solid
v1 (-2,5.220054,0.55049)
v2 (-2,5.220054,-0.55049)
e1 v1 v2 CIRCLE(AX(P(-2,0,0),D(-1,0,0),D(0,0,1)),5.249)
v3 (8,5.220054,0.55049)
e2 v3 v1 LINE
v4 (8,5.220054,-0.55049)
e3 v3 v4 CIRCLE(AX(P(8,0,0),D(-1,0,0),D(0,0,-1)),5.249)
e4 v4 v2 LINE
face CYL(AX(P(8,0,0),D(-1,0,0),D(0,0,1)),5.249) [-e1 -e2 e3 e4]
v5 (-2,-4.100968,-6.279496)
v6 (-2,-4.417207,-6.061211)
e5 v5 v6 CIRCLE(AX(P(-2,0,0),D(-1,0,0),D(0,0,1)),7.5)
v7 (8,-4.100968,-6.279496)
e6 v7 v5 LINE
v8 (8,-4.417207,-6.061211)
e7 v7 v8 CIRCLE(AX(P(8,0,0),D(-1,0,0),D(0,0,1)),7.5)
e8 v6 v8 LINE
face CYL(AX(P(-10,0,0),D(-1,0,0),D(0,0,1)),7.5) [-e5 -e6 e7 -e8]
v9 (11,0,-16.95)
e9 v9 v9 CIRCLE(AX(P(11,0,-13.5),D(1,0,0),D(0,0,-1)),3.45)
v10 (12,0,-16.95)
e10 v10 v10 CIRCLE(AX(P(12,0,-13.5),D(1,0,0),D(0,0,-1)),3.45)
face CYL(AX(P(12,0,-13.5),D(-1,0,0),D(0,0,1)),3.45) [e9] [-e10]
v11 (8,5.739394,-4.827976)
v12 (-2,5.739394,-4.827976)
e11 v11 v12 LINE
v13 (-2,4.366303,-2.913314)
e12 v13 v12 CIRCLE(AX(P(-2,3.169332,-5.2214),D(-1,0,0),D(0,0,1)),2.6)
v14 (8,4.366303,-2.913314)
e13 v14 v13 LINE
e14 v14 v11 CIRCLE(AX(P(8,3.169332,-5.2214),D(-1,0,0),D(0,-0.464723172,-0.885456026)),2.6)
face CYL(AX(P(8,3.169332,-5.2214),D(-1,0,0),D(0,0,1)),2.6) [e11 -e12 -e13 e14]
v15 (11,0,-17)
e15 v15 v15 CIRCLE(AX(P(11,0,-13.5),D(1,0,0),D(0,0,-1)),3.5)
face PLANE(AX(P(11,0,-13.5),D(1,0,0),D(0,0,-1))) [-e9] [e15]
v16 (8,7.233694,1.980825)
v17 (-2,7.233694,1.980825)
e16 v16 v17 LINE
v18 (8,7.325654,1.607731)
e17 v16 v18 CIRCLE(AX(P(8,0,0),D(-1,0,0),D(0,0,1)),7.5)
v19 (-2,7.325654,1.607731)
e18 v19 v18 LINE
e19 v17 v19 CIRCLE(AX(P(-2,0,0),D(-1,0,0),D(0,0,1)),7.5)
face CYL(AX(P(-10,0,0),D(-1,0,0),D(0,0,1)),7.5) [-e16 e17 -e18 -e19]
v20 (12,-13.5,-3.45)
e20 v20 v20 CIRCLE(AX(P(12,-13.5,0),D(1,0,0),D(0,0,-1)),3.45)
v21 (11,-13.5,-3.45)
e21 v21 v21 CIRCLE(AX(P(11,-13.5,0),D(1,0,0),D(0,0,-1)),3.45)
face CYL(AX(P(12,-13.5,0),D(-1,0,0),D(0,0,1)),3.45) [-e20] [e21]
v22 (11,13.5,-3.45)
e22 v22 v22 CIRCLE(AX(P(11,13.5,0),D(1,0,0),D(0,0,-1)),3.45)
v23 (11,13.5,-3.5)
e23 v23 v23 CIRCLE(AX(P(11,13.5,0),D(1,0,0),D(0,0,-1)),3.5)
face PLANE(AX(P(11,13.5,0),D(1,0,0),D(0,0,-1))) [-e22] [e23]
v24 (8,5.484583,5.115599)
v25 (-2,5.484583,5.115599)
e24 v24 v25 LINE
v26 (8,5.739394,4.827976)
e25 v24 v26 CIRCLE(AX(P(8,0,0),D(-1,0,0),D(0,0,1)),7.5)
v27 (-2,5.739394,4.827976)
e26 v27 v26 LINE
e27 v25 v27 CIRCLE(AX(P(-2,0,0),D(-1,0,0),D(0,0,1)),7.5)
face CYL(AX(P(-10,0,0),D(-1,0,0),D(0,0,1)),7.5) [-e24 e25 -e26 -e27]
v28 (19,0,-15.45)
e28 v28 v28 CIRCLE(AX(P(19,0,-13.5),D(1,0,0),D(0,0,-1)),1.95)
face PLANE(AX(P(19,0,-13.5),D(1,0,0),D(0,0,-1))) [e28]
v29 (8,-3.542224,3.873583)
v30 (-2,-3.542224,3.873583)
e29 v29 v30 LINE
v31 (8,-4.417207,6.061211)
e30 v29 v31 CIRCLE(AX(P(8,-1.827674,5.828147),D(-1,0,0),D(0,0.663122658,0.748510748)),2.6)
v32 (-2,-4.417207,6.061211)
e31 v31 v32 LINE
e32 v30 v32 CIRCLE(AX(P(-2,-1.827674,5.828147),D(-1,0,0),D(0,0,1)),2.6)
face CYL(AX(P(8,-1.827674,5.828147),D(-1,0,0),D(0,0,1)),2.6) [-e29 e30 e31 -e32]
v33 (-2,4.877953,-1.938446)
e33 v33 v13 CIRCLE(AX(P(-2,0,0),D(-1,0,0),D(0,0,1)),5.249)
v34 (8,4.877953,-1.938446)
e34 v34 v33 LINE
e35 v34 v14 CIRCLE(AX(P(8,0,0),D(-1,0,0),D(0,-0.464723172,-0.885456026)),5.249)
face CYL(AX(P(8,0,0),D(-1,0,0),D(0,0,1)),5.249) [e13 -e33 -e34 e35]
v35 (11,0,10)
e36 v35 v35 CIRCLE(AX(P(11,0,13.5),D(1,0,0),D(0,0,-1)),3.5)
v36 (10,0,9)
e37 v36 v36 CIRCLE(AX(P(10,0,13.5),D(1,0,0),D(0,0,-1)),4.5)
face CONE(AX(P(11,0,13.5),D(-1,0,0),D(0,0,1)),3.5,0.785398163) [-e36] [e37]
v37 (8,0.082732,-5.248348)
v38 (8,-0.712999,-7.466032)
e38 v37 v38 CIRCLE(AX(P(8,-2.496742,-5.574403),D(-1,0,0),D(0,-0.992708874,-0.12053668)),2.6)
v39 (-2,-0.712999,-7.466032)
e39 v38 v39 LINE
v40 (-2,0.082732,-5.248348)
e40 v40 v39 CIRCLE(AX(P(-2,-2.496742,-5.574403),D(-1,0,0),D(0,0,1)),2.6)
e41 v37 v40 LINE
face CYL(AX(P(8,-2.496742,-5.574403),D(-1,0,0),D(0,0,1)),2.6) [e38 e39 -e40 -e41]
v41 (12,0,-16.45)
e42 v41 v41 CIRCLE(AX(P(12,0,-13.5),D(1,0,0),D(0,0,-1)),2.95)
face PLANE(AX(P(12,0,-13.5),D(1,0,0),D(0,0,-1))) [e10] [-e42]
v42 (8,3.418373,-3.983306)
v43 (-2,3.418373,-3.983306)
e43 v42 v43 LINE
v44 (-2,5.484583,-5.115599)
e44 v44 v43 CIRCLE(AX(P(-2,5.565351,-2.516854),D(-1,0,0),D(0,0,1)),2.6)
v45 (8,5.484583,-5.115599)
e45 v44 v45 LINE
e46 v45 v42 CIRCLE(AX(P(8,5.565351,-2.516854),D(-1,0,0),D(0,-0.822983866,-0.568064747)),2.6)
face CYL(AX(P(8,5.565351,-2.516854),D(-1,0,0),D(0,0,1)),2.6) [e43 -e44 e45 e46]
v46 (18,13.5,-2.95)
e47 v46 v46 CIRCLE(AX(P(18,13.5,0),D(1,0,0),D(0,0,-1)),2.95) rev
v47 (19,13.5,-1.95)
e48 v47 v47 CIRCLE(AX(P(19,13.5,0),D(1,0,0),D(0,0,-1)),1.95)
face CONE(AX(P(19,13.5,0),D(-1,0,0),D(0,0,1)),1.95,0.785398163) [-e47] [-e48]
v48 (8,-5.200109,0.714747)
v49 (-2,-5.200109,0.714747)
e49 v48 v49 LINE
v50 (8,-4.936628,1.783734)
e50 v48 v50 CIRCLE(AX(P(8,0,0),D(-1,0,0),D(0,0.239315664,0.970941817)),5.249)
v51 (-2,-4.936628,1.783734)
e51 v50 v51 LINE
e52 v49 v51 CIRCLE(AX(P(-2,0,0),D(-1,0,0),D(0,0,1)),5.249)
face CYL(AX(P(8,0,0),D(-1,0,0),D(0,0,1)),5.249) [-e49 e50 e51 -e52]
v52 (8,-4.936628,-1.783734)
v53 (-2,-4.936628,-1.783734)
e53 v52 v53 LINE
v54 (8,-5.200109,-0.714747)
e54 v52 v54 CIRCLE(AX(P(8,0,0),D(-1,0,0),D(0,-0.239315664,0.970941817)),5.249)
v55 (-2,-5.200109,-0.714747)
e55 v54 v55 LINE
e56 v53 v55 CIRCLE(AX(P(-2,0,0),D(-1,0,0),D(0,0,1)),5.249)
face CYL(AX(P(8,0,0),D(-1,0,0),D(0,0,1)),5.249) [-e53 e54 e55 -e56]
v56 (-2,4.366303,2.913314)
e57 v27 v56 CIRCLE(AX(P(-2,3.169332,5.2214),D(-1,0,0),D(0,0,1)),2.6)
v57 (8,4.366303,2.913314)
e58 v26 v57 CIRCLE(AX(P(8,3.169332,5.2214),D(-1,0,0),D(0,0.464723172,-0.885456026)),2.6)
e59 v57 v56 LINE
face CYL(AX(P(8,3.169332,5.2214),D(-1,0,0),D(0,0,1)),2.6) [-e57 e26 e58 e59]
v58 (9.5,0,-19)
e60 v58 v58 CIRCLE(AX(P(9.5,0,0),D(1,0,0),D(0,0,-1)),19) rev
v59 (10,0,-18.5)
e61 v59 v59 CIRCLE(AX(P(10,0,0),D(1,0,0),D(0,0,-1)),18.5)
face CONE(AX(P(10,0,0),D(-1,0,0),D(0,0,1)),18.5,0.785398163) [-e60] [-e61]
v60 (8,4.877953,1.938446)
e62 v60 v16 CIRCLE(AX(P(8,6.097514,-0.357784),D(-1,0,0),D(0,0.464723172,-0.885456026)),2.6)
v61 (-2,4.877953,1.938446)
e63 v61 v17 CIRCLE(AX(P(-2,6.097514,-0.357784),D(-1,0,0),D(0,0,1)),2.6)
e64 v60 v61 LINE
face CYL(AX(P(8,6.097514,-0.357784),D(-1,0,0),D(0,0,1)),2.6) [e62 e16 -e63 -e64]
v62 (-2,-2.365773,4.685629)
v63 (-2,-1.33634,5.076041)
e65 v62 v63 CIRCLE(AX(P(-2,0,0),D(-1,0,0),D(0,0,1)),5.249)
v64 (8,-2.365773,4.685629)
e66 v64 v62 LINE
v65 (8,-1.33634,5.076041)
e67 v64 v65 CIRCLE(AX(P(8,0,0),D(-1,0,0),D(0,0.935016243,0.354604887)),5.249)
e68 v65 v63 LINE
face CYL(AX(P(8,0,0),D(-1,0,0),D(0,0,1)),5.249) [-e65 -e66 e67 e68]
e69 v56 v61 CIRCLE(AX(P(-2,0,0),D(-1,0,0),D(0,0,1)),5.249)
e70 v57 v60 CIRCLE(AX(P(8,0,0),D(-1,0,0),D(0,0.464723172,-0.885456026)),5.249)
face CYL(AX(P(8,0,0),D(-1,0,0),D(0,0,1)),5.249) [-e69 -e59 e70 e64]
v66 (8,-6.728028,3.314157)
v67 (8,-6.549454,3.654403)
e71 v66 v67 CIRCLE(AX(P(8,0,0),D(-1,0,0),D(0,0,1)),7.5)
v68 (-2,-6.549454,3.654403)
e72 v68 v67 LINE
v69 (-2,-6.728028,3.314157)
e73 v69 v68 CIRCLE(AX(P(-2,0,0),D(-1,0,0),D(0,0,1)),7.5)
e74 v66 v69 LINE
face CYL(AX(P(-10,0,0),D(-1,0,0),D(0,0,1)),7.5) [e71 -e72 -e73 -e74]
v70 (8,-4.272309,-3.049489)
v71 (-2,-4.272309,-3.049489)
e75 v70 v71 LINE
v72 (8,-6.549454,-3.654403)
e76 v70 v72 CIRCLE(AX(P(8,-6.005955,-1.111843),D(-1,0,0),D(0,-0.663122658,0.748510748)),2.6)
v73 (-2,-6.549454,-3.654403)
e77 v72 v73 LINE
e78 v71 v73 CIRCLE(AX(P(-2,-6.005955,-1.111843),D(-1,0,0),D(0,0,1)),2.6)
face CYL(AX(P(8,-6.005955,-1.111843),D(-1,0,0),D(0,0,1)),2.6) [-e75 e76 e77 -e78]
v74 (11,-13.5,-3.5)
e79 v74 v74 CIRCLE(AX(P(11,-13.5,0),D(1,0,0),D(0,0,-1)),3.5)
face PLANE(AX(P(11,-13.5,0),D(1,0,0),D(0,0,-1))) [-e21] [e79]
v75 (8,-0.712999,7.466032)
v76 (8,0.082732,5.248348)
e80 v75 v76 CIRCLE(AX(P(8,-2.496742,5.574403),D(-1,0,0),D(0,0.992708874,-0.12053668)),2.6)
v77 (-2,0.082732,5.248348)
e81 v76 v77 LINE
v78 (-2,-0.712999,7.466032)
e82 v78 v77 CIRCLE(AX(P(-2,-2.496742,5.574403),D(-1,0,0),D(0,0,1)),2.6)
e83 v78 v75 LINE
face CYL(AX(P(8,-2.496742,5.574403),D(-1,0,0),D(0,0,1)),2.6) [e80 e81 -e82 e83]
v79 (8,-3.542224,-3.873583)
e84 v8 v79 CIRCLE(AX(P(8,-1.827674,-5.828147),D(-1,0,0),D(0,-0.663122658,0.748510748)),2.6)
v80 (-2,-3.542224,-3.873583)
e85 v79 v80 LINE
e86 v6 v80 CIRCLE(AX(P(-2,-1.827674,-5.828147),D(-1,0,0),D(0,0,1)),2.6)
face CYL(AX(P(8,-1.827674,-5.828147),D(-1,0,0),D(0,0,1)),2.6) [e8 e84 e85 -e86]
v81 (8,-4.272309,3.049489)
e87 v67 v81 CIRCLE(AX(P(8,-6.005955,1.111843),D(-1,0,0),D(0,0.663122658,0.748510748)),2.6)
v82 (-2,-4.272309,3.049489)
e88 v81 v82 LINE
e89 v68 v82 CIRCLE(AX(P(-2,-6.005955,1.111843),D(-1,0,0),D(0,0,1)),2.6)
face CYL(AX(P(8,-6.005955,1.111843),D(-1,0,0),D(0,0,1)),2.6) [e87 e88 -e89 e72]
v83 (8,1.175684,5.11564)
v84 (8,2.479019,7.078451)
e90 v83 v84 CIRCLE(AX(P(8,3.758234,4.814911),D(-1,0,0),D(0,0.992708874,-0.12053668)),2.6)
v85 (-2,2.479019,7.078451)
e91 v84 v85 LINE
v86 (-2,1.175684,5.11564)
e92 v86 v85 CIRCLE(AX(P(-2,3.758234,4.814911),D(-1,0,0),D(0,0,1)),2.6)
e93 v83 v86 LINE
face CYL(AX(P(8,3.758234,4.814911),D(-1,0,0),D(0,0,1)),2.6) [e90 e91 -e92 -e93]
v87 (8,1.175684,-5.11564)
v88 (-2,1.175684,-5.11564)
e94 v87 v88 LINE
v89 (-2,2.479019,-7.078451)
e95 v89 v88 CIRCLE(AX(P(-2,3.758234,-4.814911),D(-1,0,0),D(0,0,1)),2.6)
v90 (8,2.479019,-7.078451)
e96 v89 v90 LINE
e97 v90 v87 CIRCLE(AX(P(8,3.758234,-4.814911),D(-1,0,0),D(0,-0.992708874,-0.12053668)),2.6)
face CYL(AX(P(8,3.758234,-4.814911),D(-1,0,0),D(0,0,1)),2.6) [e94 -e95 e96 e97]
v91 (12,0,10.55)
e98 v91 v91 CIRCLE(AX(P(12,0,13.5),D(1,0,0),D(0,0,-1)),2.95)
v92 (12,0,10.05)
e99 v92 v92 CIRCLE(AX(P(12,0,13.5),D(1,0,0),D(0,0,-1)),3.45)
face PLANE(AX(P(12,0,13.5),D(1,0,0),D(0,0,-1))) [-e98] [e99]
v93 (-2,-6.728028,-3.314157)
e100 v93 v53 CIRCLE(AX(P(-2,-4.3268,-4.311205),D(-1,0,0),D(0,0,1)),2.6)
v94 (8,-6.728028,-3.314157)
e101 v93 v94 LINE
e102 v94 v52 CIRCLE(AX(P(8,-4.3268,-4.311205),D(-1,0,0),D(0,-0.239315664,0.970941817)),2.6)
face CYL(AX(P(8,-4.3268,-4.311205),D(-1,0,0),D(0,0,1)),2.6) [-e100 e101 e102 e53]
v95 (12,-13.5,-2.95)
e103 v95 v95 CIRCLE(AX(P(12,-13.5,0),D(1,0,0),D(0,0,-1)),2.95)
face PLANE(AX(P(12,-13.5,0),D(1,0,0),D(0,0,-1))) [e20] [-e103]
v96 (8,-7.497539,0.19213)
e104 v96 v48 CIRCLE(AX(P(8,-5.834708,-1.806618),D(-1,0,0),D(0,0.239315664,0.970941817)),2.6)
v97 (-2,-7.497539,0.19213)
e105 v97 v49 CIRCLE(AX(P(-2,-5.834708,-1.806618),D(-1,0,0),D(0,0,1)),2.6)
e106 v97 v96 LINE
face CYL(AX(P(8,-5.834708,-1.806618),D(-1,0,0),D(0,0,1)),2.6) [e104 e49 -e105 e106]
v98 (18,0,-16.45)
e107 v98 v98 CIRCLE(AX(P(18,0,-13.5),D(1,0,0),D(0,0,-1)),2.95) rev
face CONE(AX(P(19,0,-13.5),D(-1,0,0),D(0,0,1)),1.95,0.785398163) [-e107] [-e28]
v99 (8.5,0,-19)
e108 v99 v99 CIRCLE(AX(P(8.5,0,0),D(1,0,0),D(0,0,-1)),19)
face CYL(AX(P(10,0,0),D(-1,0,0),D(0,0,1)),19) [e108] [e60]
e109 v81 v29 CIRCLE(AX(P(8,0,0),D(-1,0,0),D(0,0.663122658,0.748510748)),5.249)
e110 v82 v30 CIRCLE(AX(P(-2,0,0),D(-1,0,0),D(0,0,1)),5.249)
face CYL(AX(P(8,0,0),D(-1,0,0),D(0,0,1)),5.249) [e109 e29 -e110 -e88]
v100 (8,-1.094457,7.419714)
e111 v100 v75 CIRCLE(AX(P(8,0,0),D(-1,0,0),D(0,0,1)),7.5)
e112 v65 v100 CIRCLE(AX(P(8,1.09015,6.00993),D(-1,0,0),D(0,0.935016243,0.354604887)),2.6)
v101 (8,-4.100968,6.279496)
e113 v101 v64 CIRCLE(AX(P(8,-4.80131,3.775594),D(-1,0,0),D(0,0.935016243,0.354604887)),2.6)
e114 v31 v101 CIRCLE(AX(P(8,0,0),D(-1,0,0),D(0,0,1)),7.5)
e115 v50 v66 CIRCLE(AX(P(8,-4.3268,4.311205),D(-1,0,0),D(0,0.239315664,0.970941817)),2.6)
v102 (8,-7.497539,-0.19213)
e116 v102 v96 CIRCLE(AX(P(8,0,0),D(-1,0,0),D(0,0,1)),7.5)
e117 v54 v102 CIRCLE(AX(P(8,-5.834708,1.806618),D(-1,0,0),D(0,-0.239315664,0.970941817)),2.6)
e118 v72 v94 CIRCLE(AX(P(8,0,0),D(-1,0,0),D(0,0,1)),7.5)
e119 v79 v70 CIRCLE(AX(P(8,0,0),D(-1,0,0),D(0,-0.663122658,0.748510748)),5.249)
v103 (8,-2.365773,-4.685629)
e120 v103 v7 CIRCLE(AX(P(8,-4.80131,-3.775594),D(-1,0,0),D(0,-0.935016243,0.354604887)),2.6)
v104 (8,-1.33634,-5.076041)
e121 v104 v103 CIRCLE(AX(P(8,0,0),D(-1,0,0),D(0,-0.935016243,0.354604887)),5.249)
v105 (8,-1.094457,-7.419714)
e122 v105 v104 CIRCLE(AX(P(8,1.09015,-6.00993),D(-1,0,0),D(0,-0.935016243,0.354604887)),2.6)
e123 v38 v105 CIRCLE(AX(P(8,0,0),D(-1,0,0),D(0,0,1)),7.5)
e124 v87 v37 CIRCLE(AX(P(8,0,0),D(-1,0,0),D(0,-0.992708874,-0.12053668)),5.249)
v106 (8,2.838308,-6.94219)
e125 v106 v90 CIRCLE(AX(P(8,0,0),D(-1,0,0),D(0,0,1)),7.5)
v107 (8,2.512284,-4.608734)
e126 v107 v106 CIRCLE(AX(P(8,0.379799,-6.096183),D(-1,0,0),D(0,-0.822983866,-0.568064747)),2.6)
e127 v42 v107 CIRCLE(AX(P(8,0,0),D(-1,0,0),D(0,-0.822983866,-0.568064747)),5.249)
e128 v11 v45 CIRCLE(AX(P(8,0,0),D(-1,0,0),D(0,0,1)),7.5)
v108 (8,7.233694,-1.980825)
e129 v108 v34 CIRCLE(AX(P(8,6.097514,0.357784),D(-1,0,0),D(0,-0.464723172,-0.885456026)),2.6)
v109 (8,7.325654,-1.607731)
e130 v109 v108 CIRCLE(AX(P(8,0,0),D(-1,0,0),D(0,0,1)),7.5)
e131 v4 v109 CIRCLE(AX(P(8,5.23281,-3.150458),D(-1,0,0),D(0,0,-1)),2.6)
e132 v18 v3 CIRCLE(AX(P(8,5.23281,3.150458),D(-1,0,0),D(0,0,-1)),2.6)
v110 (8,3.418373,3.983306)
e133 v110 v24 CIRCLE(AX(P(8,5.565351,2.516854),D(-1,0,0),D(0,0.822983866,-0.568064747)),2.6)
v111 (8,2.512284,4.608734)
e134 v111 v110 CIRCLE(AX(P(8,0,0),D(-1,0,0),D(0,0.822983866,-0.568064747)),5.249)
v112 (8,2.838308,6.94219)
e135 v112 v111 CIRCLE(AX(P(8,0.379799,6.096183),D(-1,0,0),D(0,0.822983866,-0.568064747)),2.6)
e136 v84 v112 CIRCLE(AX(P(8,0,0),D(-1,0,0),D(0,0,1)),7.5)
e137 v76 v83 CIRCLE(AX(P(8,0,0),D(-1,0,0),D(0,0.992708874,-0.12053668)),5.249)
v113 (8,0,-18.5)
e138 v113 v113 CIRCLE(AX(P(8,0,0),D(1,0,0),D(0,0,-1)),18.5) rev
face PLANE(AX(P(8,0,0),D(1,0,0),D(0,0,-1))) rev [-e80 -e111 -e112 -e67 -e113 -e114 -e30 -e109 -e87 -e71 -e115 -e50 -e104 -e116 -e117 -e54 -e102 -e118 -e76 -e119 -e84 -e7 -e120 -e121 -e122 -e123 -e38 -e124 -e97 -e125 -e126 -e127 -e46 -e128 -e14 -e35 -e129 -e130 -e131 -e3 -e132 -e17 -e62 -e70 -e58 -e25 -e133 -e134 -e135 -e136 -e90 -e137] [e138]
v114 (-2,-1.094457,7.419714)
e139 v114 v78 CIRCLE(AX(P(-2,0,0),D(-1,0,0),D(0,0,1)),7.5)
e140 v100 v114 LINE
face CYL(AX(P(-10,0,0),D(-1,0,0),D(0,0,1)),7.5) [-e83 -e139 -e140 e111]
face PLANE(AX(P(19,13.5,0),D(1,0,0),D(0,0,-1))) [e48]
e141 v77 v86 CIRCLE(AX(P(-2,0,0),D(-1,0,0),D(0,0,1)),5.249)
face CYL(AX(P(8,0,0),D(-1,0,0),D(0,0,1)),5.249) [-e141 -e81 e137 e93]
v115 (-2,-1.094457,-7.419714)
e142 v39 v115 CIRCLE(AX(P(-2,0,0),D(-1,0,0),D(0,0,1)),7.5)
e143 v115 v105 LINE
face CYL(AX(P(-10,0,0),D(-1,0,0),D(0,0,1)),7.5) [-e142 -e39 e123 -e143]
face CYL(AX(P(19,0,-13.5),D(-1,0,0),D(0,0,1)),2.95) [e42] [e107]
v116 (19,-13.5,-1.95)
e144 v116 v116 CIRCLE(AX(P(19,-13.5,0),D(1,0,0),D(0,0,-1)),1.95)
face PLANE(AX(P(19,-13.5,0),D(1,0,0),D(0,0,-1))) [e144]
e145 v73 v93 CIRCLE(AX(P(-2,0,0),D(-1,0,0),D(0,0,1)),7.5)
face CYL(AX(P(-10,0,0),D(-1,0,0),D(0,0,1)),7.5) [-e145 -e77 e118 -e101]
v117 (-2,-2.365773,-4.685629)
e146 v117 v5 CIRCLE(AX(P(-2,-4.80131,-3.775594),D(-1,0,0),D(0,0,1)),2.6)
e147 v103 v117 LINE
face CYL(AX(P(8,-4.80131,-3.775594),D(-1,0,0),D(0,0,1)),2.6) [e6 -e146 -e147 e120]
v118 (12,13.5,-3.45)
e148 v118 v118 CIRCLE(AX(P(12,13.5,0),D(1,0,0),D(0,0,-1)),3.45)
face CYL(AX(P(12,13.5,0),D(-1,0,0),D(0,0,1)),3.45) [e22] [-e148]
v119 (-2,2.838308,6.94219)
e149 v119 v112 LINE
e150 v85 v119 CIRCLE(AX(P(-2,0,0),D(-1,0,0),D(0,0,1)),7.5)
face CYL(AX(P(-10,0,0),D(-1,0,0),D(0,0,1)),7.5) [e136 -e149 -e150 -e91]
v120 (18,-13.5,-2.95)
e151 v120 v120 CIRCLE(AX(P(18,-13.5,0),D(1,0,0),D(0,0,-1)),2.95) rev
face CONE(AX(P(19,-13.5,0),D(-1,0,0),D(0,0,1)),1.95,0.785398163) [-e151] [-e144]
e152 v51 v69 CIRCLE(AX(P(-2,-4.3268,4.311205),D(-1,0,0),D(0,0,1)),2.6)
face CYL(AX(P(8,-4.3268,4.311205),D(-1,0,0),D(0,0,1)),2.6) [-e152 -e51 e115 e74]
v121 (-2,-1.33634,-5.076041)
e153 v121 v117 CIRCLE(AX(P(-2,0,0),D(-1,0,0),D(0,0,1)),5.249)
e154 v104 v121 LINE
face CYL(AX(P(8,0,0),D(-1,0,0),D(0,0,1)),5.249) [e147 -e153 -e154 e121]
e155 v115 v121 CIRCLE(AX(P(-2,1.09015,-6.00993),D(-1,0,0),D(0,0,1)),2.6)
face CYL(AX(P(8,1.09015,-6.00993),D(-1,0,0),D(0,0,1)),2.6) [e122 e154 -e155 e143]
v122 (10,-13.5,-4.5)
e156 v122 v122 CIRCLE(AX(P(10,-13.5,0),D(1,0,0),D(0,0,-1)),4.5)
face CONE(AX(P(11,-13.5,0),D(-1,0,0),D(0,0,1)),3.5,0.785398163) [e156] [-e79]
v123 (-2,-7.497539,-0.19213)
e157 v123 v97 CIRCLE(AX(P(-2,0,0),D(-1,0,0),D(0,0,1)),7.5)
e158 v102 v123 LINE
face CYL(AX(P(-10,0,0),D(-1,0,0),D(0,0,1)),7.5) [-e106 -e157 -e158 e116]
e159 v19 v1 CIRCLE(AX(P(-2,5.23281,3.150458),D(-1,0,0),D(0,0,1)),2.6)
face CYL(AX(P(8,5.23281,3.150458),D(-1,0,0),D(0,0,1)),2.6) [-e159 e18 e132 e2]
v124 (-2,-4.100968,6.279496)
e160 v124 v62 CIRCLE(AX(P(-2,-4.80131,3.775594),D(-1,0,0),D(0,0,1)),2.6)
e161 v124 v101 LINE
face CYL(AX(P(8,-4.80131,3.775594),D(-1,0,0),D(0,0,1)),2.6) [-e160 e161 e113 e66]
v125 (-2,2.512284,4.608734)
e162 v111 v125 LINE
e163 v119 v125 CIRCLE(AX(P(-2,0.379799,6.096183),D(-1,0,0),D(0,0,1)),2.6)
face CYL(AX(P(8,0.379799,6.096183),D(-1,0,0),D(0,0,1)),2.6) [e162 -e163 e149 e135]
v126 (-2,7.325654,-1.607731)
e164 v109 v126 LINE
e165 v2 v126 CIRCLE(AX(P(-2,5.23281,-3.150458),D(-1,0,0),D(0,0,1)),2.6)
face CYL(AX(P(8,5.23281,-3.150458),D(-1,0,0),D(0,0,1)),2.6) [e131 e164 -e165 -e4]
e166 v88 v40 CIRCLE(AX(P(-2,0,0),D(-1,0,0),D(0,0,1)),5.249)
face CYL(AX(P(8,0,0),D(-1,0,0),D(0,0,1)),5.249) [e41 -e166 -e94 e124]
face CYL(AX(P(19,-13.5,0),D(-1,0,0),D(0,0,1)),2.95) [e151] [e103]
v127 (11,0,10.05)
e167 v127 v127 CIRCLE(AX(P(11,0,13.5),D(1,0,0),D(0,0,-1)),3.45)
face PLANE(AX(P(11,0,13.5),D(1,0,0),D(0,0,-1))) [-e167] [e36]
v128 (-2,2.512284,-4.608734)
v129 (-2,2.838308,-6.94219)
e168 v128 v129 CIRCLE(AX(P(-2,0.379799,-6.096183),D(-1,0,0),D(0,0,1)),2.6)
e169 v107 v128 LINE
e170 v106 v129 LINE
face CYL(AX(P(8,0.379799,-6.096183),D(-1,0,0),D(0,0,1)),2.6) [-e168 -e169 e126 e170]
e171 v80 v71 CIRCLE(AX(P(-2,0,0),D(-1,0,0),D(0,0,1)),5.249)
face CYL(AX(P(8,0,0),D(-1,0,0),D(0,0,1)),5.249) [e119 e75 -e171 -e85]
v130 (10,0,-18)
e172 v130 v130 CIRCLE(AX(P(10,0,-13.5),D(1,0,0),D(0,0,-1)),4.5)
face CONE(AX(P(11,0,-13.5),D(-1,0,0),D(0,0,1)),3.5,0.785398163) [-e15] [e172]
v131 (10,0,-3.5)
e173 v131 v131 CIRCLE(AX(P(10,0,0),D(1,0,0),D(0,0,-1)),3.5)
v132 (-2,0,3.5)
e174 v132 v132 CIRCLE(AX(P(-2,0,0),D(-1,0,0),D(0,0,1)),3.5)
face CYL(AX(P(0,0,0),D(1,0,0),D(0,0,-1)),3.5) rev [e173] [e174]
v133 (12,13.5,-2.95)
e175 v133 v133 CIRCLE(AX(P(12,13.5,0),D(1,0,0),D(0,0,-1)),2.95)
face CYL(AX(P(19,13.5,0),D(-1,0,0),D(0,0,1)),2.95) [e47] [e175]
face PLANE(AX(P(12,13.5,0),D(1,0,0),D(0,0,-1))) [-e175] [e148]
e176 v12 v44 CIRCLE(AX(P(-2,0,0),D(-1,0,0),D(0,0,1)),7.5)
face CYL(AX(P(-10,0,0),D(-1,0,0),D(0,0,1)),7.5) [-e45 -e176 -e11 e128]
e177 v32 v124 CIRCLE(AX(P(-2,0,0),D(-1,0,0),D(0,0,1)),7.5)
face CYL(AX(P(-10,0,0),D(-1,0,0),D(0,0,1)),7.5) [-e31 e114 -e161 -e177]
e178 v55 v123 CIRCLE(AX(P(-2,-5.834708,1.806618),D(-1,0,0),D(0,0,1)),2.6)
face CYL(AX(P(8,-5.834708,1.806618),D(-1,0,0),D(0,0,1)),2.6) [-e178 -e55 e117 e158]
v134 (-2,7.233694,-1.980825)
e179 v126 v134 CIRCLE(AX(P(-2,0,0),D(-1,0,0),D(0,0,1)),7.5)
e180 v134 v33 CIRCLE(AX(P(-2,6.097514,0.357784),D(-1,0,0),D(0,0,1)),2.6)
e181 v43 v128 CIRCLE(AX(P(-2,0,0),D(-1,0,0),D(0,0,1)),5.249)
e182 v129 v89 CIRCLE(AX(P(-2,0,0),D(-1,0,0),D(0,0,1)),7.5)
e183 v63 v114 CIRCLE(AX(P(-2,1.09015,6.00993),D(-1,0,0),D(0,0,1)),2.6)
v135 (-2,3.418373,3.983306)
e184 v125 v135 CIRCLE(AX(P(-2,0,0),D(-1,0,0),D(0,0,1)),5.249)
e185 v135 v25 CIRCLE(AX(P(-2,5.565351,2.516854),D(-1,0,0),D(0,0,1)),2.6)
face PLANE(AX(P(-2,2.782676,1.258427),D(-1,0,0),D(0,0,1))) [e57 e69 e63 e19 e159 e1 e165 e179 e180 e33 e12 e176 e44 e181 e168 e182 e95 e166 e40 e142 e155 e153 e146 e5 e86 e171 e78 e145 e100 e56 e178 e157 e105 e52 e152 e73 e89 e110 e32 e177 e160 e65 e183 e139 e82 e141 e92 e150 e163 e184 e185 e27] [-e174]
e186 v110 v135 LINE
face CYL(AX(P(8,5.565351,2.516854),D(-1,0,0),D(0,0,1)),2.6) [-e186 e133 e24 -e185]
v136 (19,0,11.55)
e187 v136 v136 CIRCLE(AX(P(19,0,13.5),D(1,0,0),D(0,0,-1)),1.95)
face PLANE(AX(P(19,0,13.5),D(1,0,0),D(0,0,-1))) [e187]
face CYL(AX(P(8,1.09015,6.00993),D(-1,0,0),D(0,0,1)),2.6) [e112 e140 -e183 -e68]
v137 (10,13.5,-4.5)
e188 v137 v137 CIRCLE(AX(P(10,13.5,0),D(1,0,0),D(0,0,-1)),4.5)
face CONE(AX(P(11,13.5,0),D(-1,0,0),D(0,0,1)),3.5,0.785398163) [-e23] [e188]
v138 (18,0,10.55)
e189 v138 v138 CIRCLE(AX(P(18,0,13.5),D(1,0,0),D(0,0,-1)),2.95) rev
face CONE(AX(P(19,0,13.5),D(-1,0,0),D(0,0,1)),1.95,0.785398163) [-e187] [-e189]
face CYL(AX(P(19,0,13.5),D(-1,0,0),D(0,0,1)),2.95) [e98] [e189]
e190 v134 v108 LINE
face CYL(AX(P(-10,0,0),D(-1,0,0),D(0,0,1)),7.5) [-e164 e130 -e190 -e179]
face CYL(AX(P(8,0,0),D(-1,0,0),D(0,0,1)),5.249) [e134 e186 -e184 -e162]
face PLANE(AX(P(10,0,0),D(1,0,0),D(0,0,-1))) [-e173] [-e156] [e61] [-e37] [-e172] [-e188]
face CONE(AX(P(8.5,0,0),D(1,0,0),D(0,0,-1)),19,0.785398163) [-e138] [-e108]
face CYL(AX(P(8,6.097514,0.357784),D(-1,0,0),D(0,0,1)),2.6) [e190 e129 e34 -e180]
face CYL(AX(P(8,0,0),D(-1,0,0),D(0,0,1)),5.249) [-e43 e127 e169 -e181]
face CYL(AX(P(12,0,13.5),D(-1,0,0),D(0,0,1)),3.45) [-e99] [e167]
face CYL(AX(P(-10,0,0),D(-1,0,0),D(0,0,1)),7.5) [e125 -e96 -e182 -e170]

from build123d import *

# Parameters (mm, degrees)
BOSS_EXTRUDE1_OUTLINE_R   = 19
BOSS_EXTRUDE1_DEPTH       = 2
BOSS_EXTRUDE1_START       = -8
BOSS_EXTRUDE1_2_OUTLINE_R = 2.5
BOSS_EXTRUDE1_2_DEPTH     = 8
SKETCH2_R                 = 3.5
CUT_EXTRUDE1_DEPTH        = 29.670542374
SKETCH3_R                 = 2.95
BOSS_EXTRUDE2_DEPTH       = 9
BOSS_EXTRUDE3_START       = 2
SKETCH5_R                 = 3.5
BOSS_EXTRUDE3_DEPTH       = 2
SKETCH6_R                 = 4.5
BOSS_EXTRUDE4_DEPTH       = 1
SKETCH7_R                 = 3.45
BOSS_EXTRUDE5_DEPTH       = 1
CHAMFER3_SIZE             = 1
CHAMFER4_SIZE             = 1
CHAMFER5_SIZE             = 0.5
SKETCH8_R                 = 3.065
BOSS_EXTRUDE6_DEPTH       = 1
CHAMFER7_SIZE             = 0.1
CUT_EXTRUDE2_START        = -5
SKETCH9_R                 = 3.929046374
SKETCH9_R_2               = 2.95
CUT_EXTRUDE2_DEPTH        = 5


with BuildPart() as part:
    # Boss-Extrude1: read off the stored shape, not the designer's step
    # Boss-Extrude1 outline → Boss-Extrude1 (new body)
    with BuildSketch(Plane(origin=(8, 0, 0), x_dir=(0, 0, -1), z_dir=(1, 0, 0))):
        Circle(BOSS_EXTRUDE1_OUTLINE_R)
    extrude(amount=BOSS_EXTRUDE1_DEPTH)

    # Boss-Extrude1 2 outline → Boss-Extrude1 2 (add)
    with BuildSketch(Plane(origin=(8, 0, 0), x_dir=(0, 0, -1), z_dir=(1, 0, 0)).offset(BOSS_EXTRUDE1_START)):
        with BuildLine():
            ThreePointArc((-4.827976462, 5.739393982), (-4.973419937, 5.613830611), (-5.115599083, 5.484582575))
            ThreePointArc((-5.115599083, 5.484582575), (-4.796933675, 4.315856884), (-3.983306334, 3.41837266))
            ThreePointArc((-3.983306334, 3.41837266), (-4.319842312, 2.981771856), (-4.608733854, 2.512284471))
            ThreePointArc((-4.608733854, 2.512284471), (-5.736412412, 2.954786958), (-6.942190227, 2.838308449))
            ThreePointArc((-6.942190227, 2.838308449), (-7.01262182, 2.659536653), (-7.078450644, 2.479019256))
            ThreePointArc((-7.078450644, 2.479019256), (-6.253152528, 1.592255251), (-5.115639582, 1.175683915))
            ThreePointArc((-5.115639582, 1.175683915), (-5.21072888, 0.632697034), (-5.24834797, 0.082732007))
            ThreePointArc((-5.24834797, 0.082732007), (-6.452498904, -0.049509856), (-7.466031873, -0.712999344))
            ThreePointArc((-7.466031873, -0.712999344), (-7.445316556, -0.904025102), (-7.419714468, -1.094457498))
            ThreePointArc((-7.419714468, -1.094457498), (-6.276849497, -1.496112872), (-5.076041451, -1.336339847))
            ThreePointArc((-5.076041451, -1.336339847), (-4.907900258, -1.861321052), (-4.685628816, -2.365773362))
            ThreePointArc((-4.685628816, -2.365773362), (-5.690395658, -3.042464558), (-6.279495593, -4.10096758))
            ThreePointArc((-6.279495593, -4.10096758), (-6.172378994, -4.2604856), (-6.061211124, -4.41720723))
            ThreePointArc((-6.061211124, -4.41720723), (-4.862595889, -4.241739566), (-3.873583397, -3.542224254))
            ThreePointArc((-3.873583397, -3.542224254), (-3.480730833, -3.928932917), (-3.049488568, -4.272308565))
            ThreePointArc((-3.049488568, -4.272308565), (-3.624691343, -5.338427296), (-3.654402549, -6.549453566))
            ThreePointArc((-3.654402549, -6.549453566), (-3.48542379, -6.640920192), (-3.314157357, -6.728028018))
            ThreePointArc((-3.314157357, -6.728028018), (-2.334380164, -6.015634844), (-1.783734068, -4.936627773))
            ThreePointArc((-1.783734068, -4.936627773), (-1.256167922, -5.0964736), (-0.714747239, -5.200109363))
            ThreePointArc((-0.714747239, -5.200109363), (-0.728613924, -6.411420676), (-0.192129921, -7.497538669))
            ThreePointArc((-0.192129921, -7.497538669), (0, -7.5), (0.192129921, -7.497538669))
            ThreePointArc((0.192129921, -7.497538669), (0.728613924, -6.411420676), (0.714747239, -5.200109363))
            ThreePointArc((0.714747239, -5.200109363), (1.256167922, -5.0964736), (1.783734068, -4.936627773))
            ThreePointArc((1.783734068, -4.936627773), (2.334380164, -6.015634844), (3.314157357, -6.728028018))
            ThreePointArc((3.314157357, -6.728028018), (3.48542379, -6.640920192), (3.654402549, -6.549453566))
            ThreePointArc((3.654402549, -6.549453566), (3.624691343, -5.338427296), (3.049488568, -4.272308565))
            ThreePointArc((3.049488568, -4.272308565), (3.480730833, -3.928932917), (3.873583397, -3.542224254))
            ThreePointArc((3.873583397, -3.542224254), (4.862595889, -4.241739566), (6.061211124, -4.41720723))
            ThreePointArc((6.061211124, -4.41720723), (6.172378994, -4.2604856), (6.279495593, -4.10096758))
            ThreePointArc((6.279495593, -4.10096758), (5.690395658, -3.042464558), (4.685628816, -2.365773362))
            ThreePointArc((4.685628816, -2.365773362), (4.907900258, -1.861321052), (5.076041451, -1.336339847))
            ThreePointArc((5.076041451, -1.336339847), (6.276849497, -1.496112872), (7.419714468, -1.094457498))
            ThreePointArc((7.419714468, -1.094457498), (7.445316556, -0.904025102), (7.466031873, -0.712999344))
            ThreePointArc((7.466031873, -0.712999344), (6.452498904, -0.049509856), (5.24834797, 0.082732007))
            ThreePointArc((5.24834797, 0.082732007), (5.21072888, 0.632697034), (5.115639582, 1.175683915))
            ThreePointArc((5.115639582, 1.175683915), (6.253152528, 1.592255251), (7.078450644, 2.479019256))
            ThreePointArc((7.078450644, 2.479019256), (7.01262182, 2.659536653), (6.942190227, 2.838308449))
            ThreePointArc((6.942190227, 2.838308449), (5.736412412, 2.954786958), (4.608733854, 2.512284471))
            ThreePointArc((4.608733854, 2.512284471), (4.319842312, 2.981771856), (3.983306334, 3.41837266))
            ThreePointArc((3.983306334, 3.41837266), (4.796933675, 4.315856884), (5.115599083, 5.484582575))
            ThreePointArc((5.115599083, 5.484582575), (4.973419937, 5.613830611), (4.827976462, 5.739393982))
            ThreePointArc((4.827976462, 5.739393982), (3.706182968, 5.282177689), (2.913314353, 4.366302839))
            ThreePointArc((2.913314353, 4.366302839), (2.43933193, 4.647758679), (1.93844561, 4.877953425))
            ThreePointArc((1.93844561, 4.877953425), (2.241795126, 6.050747718), (1.980825421, 7.233694122))
            ThreePointArc((1.980825421, 7.233694122), (1.794867482, 7.282063631), (1.607731473, 7.325653521))
            ThreePointArc((1.607731473, 7.325653521), (0.82691167, 6.399485168), (0.550489643, 5.220053846))
            ThreePointArc((0.550489643, 5.220053846), (0, 5.249), (-0.550489643, 5.220053846))
            ThreePointArc((-0.550489643, 5.220053846), (-0.82691167, 6.399485168), (-1.607731473, 7.325653521))
            ThreePointArc((-1.607731473, 7.325653521), (-1.794867482, 7.282063631), (-1.980825421, 7.233694122))
            ThreePointArc((-1.980825421, 7.233694122), (-2.241795126, 6.050747718), (-1.93844561, 4.877953425))
            ThreePointArc((-1.93844561, 4.877953425), (-2.43933193, 4.647758679), (-2.913314353, 4.366302839))
            ThreePointArc((-2.913314353, 4.366302839), (-3.706182968, 5.282177689), (-4.827976462, 5.739393982))
        make_face()
        Circle(BOSS_EXTRUDE1_2_OUTLINE_R, mode=Mode.SUBTRACT)
    extrude(amount=BOSS_EXTRUDE1_2_DEPTH)

    # Sketch2 → Cut-Extrude1 (cut, through all)
    with BuildSketch(Plane(origin=(10, 0, 0), x_dir=(0, 0, -1), z_dir=(1, 0, 0))):
        Circle(SKETCH2_R)
    extrude(amount=-CUT_EXTRUDE1_DEPTH, mode=Mode.SUBTRACT)

    # Sketch3 → Boss-Extrude2 (add)
    with BuildSketch(Plane(origin=(10, 0, 0), x_dir=(0, 0, -1), z_dir=(1, 0, 0))):
        with Locations((-13.5, 0)):
            Circle(SKETCH3_R)
        with Locations((0, 13.5)):
            Circle(SKETCH3_R)
        with Locations((13.5, 0)):
            Circle(SKETCH3_R)
        with Locations((0, -13.5)):
            Circle(SKETCH3_R)
    extrude(amount=BOSS_EXTRUDE2_DEPTH)

    # Sketch5 → Boss-Extrude3 (add)
    with BuildSketch(Plane.ZY.offset(BOSS_EXTRUDE3_START)):
        with BuildLine():
            ThreePointArc((3.983306334, 3.41837266), (4.796933675, 4.315856884), (5.115599083, 5.484582575))
            ThreePointArc((5.115599083, 5.484582575), (4.973419937, 5.613830611), (4.827976462, 5.739393982))
            ThreePointArc((4.827976462, 5.739393982), (3.706182968, 5.282177689), (2.913314353, 4.366302839))
            ThreePointArc((2.913314353, 4.366302839), (2.43933193, 4.647758679), (1.93844561, 4.877953425))
            ThreePointArc((1.93844561, 4.877953425), (2.241795126, 6.050747718), (1.980825421, 7.233694122))
            ThreePointArc((1.980825421, 7.233694122), (1.794867482, 7.282063631), (1.607731473, 7.325653521))
            ThreePointArc((1.607731473, 7.325653521), (0.82691167, 6.399485168), (0.550489643, 5.220053846))
            ThreePointArc((0.550489643, 5.220053846), (0, 5.249), (-0.550489643, 5.220053846))
            ThreePointArc((-0.550489643, 5.220053846), (-0.82691167, 6.399485168), (-1.607731473, 7.325653521))
            ThreePointArc((-1.607731473, 7.325653521), (-1.794867482, 7.282063631), (-1.980825421, 7.233694122))
            ThreePointArc((-1.980825421, 7.233694122), (-2.241795126, 6.050747718), (-1.93844561, 4.877953425))
            ThreePointArc((-1.93844561, 4.877953425), (-2.43933193, 4.647758679), (-2.913314353, 4.366302839))
            ThreePointArc((-2.913314353, 4.366302839), (-3.706182968, 5.282177689), (-4.827976462, 5.739393982))
            ThreePointArc((-4.827976462, 5.739393982), (-4.973419937, 5.613830611), (-5.115599083, 5.484582575))
            ThreePointArc((-5.115599083, 5.484582575), (-4.796933675, 4.315856884), (-3.983306334, 3.41837266))
            ThreePointArc((-3.983306334, 3.41837266), (-4.319842312, 2.981771856), (-4.608733854, 2.512284471))
            ThreePointArc((-4.608733854, 2.512284471), (-5.736412412, 2.954786958), (-6.942190227, 2.838308449))
            ThreePointArc((-6.942190227, 2.838308449), (-7.01262182, 2.659536653), (-7.078450644, 2.479019256))
            ThreePointArc((-7.078450644, 2.479019256), (-6.253152529, 1.592255251), (-5.115639582, 1.175683915))
            ThreePointArc((-5.115639582, 1.175683915), (-5.21072888, 0.632697035), (-5.24834797, 0.082732007))
            ThreePointArc((-5.24834797, 0.082732007), (-6.452498904, -0.049509856), (-7.466031873, -0.712999344))
            ThreePointArc((-7.466031873, -0.712999344), (-7.445316556, -0.904025102), (-7.419714468, -1.094457498))
            ThreePointArc((-7.419714468, -1.094457498), (-6.276849497, -1.496112872), (-5.076041451, -1.336339847))
            ThreePointArc((-5.076041451, -1.336339847), (-4.907900258, -1.861321052), (-4.685628816, -2.365773362))
            ThreePointArc((-4.685628816, -2.365773362), (-5.690395658, -3.042464558), (-6.279495593, -4.10096758))
            ThreePointArc((-6.279495593, -4.10096758), (-6.172378994, -4.2604856), (-6.061211124, -4.41720723))
            ThreePointArc((-6.061211124, -4.41720723), (-4.862595889, -4.241739566), (-3.873583397, -3.542224254))
            ThreePointArc((-3.873583397, -3.542224254), (-3.480730833, -3.928932917), (-3.049488568, -4.272308565))
            ThreePointArc((-3.049488568, -4.272308565), (-3.624691343, -5.338427296), (-3.654402549, -6.549453566))
            ThreePointArc((-3.654402549, -6.549453566), (-3.48542379, -6.640920192), (-3.314157357, -6.728028018))
            ThreePointArc((-3.314157357, -6.728028018), (-2.334380164, -6.015634844), (-1.783734068, -4.936627773))
            ThreePointArc((-1.783734068, -4.936627773), (-1.256167922, -5.0964736), (-0.714747239, -5.200109363))
            ThreePointArc((-0.714747239, -5.200109363), (-0.728613924, -6.411420676), (-0.192129921, -7.497538669))
            ThreePointArc((-0.192129921, -7.497538669), (0, -7.5), (0.192129921, -7.497538669))
            ThreePointArc((0.192129921, -7.497538669), (0.728613924, -6.411420676), (0.714747239, -5.200109363))
            ThreePointArc((0.714747239, -5.200109363), (1.256167922, -5.0964736), (1.783734068, -4.936627773))
            ThreePointArc((1.783734068, -4.936627773), (2.334380164, -6.015634844), (3.314157357, -6.728028018))
            ThreePointArc((3.314157357, -6.728028018), (3.48542379, -6.640920192), (3.654402549, -6.549453566))
            ThreePointArc((3.654402549, -6.549453566), (3.624691343, -5.338427296), (3.049488568, -4.272308565))
            ThreePointArc((3.049488568, -4.272308565), (3.480730833, -3.928932917), (3.873583397, -3.542224254))
            ThreePointArc((3.873583397, -3.542224254), (4.862595889, -4.241739566), (6.061211124, -4.41720723))
            ThreePointArc((6.061211124, -4.41720723), (6.172378994, -4.2604856), (6.279495593, -4.10096758))
            ThreePointArc((6.279495593, -4.10096758), (5.690395658, -3.042464558), (4.685628816, -2.365773362))
            ThreePointArc((4.685628816, -2.365773362), (4.907900258, -1.861321052), (5.076041451, -1.336339847))
            ThreePointArc((5.076041451, -1.336339847), (6.276849497, -1.496112872), (7.419714468, -1.094457498))
            ThreePointArc((7.419714468, -1.094457498), (7.445316556, -0.904025102), (7.466031873, -0.712999344))
            ThreePointArc((7.466031873, -0.712999344), (6.452498904, -0.049509856), (5.24834797, 0.082732007))
            ThreePointArc((5.24834797, 0.082732007), (5.21072888, 0.632697035), (5.115639582, 1.175683915))
            ThreePointArc((5.115639582, 1.175683915), (6.253152529, 1.592255251), (7.078450644, 2.479019256))
            ThreePointArc((7.078450644, 2.479019256), (7.01262182, 2.659536653), (6.942190227, 2.838308449))
            ThreePointArc((6.942190227, 2.838308449), (5.736412412, 2.954786958), (4.608733854, 2.512284471))
            ThreePointArc((4.608733854, 2.512284471), (4.319842312, 2.981771856), (3.983306334, 3.41837266))
        make_face()
        with Locations(Location((0, 0, 0), (0, 0, 180))):
            Circle(SKETCH5_R, mode=Mode.SUBTRACT)
    extrude(amount=-BOSS_EXTRUDE3_DEPTH)

    # Sketch6 → Boss-Extrude4 (add)
    with BuildSketch(Plane(origin=(10, 0, 0), x_dir=(0, 0, -1), z_dir=(1, 0, 0))):
        with Locations((-13.5, 0)):
            Circle(SKETCH6_R)
        with Locations((0, 13.5)):
            Circle(SKETCH6_R)
        with Locations((13.5, 0)):
            Circle(SKETCH6_R)
        with Locations((0, -13.5)):
            Circle(SKETCH6_R)
    extrude(amount=BOSS_EXTRUDE4_DEPTH)

    # Sketch7 → Boss-Extrude5 (add)
    with BuildSketch(Plane(origin=(11, 0, 0), x_dir=(0, 0, -1), z_dir=(1, 0, 0))):
        with Locations((-13.5, 0)):
            Circle(SKETCH7_R)
        with Locations((0, 13.5)):
            Circle(SKETCH7_R)
        with Locations((13.5, 0)):
            Circle(SKETCH7_R)
        with Locations((0, -13.5)):
            Circle(SKETCH7_R)
    extrude(amount=BOSS_EXTRUDE5_DEPTH)

    # Chamfer3
    chamfer3_edges = [part.edges().sort_by_distance(p)[0] for p in [
        (11, 0, 18),
        (11, 13.5, 4.5),
        (11, 0, -9),
        (11, -13.5, 4.5),
    ]]
    chamfer(chamfer3_edges, length=CHAMFER3_SIZE - 0.0001)  # a hair under: the kernel refuses the full size

    # Chamfer4
    chamfer4_edges = [part.edges().sort_by_distance(p)[0] for p in [
        (19, 0, 16.45),
        (19, 13.5, 2.95),
        (19, 0, -10.55),
        (19, -13.5, 2.95),
    ]]
    chamfer(chamfer4_edges, length=CHAMFER4_SIZE)

    # Chamfer5
    chamfer5_edges = [part.edges().sort_by_distance(p)[0] for p in [
        (8, 0, 19),
        (10, 0, 19),
    ]]
    chamfer(chamfer5_edges, length=CHAMFER5_SIZE)

    # Sketch8 → Boss-Extrude6 (add)
    with BuildSketch(Plane(origin=(15, 0, 0), x_dir=(0, 0, -1), z_dir=(1, 0, 0))):
        with Locations((0, 13.5)):
            Circle(SKETCH8_R)
        with Locations((13.5, 0)):
            Circle(SKETCH8_R)
        with Locations((0, -13.5)):
            Circle(SKETCH8_R)
        with Locations((-13.5, 0)):
            Circle(SKETCH8_R)
    extrude(amount=BOSS_EXTRUDE6_DEPTH)

    # Chamfer7
    chamfer7_edges = [part.edges().sort_by_distance(p)[0] for p in [
        (16, 13.5, 3.065),
        (16, 0, -10.435),
        (16, -13.5, 3.065),
        (16, 0, 16.565),
    ]]
    chamfer(chamfer7_edges, length=CHAMFER7_SIZE)

    # Sketch9 → Cut-Extrude2 (cut)
    # profile 1 of 4: a face of its own
    with BuildSketch(Plane(origin=(19, 0, 0), x_dir=(0, 0, -1), z_dir=(1, 0, 0)).offset(CUT_EXTRUDE2_START)):
        with Locations((-13.5, 0)):
            Circle(SKETCH9_R)
        with Locations((-13.5, 0)):
            Circle(SKETCH9_R_2, mode=Mode.SUBTRACT)
    # profile 2 of 4: a face of its own
    with BuildSketch(Plane(origin=(19, 0, 0), x_dir=(0, 0, -1), z_dir=(1, 0, 0)).offset(CUT_EXTRUDE2_START)):
        with Locations((0, 13.5)):
            Circle(SKETCH9_R)
        with Locations((0, 13.5)):
            Circle(SKETCH9_R_2, mode=Mode.SUBTRACT)
    # profile 3 of 4: a face of its own
    with BuildSketch(Plane(origin=(19, 0, 0), x_dir=(0, 0, -1), z_dir=(1, 0, 0)).offset(CUT_EXTRUDE2_START)):
        with Locations((13.5, 0)):
            Circle(SKETCH9_R)
        with Locations((13.5, 0)):
            Circle(SKETCH9_R_2, mode=Mode.SUBTRACT)
    # profile 4 of 4: a face of its own
    with BuildSketch(Plane(origin=(19, 0, 0), x_dir=(0, 0, -1), z_dir=(1, 0, 0)).offset(CUT_EXTRUDE2_START)):
        with Locations((0, -13.5)):
            Circle(SKETCH9_R)
        with Locations((0, -13.5)):
            Circle(SKETCH9_R_2, mode=Mode.SUBTRACT)
    extrude(amount=CUT_EXTRUDE2_DEPTH, mode=Mode.SUBTRACT)


solid = part.part
